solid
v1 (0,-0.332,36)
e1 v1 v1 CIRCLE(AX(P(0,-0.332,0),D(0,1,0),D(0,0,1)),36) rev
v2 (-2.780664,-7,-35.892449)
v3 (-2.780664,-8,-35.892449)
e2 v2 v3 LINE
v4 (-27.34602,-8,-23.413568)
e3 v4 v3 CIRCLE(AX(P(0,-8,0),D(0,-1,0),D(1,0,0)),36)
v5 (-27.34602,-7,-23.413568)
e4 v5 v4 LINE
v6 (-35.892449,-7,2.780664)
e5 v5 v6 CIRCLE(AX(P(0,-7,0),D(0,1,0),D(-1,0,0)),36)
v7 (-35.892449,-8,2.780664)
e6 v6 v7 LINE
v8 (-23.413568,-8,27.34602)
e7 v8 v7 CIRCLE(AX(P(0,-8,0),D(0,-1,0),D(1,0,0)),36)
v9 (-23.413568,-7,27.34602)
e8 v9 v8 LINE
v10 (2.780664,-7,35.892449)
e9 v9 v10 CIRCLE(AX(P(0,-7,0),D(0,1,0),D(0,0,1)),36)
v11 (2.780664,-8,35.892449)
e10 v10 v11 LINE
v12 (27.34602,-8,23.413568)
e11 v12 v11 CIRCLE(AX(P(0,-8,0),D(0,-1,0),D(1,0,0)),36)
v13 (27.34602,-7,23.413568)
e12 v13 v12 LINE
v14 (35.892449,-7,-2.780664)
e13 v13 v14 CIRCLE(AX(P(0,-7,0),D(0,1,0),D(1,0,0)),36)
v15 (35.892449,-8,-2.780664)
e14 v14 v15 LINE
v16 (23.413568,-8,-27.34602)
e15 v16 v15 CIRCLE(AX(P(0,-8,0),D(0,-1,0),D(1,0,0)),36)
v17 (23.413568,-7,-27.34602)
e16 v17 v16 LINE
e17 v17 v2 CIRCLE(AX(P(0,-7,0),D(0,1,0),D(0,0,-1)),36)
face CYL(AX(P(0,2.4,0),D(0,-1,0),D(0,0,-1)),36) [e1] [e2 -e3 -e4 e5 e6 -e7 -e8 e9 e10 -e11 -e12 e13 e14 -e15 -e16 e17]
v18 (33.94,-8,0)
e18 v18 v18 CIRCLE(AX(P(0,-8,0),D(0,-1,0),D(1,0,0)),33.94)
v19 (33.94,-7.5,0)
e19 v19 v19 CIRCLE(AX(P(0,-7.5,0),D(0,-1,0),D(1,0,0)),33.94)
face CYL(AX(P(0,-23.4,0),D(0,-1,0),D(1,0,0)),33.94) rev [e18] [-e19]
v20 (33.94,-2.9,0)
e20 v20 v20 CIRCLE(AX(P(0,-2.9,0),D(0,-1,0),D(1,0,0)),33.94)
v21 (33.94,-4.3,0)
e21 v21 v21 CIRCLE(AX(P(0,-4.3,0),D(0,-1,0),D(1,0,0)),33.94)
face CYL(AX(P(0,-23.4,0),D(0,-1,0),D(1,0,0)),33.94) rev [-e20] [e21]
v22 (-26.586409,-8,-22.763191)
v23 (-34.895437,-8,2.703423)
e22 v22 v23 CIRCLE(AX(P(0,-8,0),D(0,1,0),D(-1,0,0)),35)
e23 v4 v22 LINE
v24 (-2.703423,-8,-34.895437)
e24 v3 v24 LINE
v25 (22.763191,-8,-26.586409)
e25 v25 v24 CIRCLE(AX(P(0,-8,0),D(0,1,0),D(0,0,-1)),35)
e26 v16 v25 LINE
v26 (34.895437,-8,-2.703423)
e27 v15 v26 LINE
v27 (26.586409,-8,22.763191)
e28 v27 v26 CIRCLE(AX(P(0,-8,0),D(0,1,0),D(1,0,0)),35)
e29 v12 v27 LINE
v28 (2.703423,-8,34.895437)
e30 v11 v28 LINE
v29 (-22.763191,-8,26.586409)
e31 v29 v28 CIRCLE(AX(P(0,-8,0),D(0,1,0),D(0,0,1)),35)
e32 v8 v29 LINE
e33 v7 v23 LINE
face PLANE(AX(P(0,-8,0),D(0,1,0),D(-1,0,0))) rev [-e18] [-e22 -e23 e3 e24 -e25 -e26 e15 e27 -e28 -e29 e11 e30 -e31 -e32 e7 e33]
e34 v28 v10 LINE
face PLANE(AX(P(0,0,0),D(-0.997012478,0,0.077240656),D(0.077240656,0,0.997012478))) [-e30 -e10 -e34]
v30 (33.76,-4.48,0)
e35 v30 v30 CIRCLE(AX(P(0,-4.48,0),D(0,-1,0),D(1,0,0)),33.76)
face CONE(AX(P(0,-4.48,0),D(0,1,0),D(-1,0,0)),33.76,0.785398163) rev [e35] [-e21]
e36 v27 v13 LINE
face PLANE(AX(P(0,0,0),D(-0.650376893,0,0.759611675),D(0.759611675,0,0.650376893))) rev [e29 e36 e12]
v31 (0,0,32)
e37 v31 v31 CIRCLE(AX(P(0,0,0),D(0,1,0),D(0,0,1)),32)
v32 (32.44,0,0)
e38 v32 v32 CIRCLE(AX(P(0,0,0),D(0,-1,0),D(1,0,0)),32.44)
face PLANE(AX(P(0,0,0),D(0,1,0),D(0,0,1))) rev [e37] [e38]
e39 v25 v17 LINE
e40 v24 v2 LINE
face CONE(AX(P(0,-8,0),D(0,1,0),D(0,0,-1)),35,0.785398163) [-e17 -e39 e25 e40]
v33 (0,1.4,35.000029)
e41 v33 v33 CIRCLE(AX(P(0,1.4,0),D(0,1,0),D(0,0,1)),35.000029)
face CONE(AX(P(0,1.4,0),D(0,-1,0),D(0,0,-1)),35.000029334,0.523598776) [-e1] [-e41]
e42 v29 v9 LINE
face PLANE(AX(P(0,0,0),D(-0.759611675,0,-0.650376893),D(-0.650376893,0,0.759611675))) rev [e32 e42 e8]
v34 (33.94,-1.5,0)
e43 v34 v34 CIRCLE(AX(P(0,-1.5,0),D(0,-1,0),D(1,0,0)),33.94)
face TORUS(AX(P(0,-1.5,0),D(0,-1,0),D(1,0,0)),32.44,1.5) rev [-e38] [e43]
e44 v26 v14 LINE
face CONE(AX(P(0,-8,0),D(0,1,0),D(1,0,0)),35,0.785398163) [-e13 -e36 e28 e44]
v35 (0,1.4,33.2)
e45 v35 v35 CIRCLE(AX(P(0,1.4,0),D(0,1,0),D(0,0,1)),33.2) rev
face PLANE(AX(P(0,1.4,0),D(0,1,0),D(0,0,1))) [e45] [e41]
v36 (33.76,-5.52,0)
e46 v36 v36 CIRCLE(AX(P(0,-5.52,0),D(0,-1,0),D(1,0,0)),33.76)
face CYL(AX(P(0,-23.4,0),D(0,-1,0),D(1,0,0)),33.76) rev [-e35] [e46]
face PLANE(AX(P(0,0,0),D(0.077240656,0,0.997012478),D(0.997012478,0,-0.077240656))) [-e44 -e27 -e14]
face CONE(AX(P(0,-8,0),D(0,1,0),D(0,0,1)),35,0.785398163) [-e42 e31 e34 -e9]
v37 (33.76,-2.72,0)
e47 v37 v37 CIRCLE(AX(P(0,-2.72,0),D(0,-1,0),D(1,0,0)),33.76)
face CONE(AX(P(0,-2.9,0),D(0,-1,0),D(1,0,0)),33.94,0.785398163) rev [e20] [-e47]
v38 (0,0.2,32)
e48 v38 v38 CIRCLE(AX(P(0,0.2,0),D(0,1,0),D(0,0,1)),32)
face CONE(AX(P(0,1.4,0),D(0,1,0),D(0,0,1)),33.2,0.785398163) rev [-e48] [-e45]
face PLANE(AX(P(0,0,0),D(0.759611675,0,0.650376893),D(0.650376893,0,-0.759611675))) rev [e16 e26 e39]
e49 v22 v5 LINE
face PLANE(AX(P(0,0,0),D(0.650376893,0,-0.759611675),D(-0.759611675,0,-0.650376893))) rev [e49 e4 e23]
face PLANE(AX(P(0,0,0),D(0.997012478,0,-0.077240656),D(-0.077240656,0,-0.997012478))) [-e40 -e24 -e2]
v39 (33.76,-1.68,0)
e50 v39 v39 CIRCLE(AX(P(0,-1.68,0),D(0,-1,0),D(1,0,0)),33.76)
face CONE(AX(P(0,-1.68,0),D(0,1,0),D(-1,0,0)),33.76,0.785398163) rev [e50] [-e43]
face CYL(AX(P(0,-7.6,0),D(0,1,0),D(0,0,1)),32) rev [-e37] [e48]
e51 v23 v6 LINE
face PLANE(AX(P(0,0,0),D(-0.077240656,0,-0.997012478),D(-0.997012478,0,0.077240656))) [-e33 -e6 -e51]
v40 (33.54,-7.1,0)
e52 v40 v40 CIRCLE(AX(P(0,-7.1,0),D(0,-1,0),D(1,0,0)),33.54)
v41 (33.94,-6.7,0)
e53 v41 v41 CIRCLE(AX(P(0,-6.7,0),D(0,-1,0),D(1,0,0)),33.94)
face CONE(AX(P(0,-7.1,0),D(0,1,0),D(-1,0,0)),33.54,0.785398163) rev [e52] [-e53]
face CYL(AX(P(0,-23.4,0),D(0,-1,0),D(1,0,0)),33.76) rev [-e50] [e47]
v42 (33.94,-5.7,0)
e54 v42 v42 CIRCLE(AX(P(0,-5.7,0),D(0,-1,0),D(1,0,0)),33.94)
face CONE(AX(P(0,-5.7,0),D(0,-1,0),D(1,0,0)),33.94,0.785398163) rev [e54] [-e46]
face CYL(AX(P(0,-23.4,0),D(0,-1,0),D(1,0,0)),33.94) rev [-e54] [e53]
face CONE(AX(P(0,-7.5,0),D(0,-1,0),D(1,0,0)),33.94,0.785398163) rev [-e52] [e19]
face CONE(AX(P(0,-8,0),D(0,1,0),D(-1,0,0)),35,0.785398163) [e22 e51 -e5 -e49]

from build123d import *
from build123d.topology import SkipClean

# Parameters (mm, degrees)
SKETCH_1_R               = 36
EXTRUDE_1_DEPTH          = 2.4
SKETCH_3_R               = 32
CUT_EXTRUDE_1_DEPTH      = 10
SKETCH_4_R               = 36
CUT_EXTRUDE_2_DEPTH      = 1
CHAMFER_3_SIZE           = 1.732
CHAMFER_3_SIZE2          = 0.999970666
CHAMFER_2_SIZE           = 1.2
CUT_REVOLVE_1_ANGLE      = 45
PATTERN_CIRCULAR_1_COUNT = 4


with BuildPart() as part:
    # 草图1 → 凸台-拉伸1 (new body)
    with BuildSketch(Plane(origin=(0, 0, 0), x_dir=(1, 0, 0), z_dir=(0, 1, 0))):
        with Locations(Location((0, 0, 0), (0, 0, 270))):
            Circle(SKETCH_1_R)
    extrude(amount=EXTRUDE_1_DEPTH)

    # 草图2 → 旋转1 (revolve)
    with SkipClean():  # the faces are left unmerged after this step: merging them gives an invalid solid
        with BuildSketch(Plane.XY):
            with BuildLine():
                Line((33.94, -7.5), (33.94, -8))
                Line((33.94, -8), (36, -8))
                Line((36, -8), (36, 0))
                Line((36, 0), (32.44, 0))
                ThreePointArc((32.44, 0), (33.500660172, -0.439339828), (33.94, -1.5))
                Line((33.94, -1.5), (33.76, -1.68))
                Line((33.76, -1.68), (33.76, -2.72))
                Line((33.76, -2.72), (33.94, -2.9))
                Line((33.94, -2.9), (33.94, -4.3))
                Line((33.94, -4.3), (33.76, -4.48))
                Line((33.76, -4.48), (33.76, -5.52))
                Line((33.76, -5.52), (33.94, -5.7))
                Line((33.94, -5.7), (33.94, -6.7))
                Line((33.94, -6.7), (33.54, -7.1))
                Line((33.54, -7.1), (33.94, -7.5))
            make_face()
        revolve(axis=Axis((0, -23.4, 0), (0, 1, 0)))
    add(part.part.scale(1), mode=Mode.REPLACE)  # the faces are merged on a copy

    # 草图3 → 切除-拉伸1 (cut)
    with BuildSketch(Plane(origin=(0, 2.4, 0), x_dir=(1, 0, 0), z_dir=(0, 1, 0))):
        with Locations(Location((0, 0, 0), (0, 0, 270))):
            Circle(SKETCH_3_R)
    extrude(amount=-CUT_EXTRUDE_1_DEPTH, mode=Mode.SUBTRACT)

    # 草图4 → 切除-拉伸2 (cut)
    with BuildSketch(Plane(origin=(0, 2.4, 0), x_dir=(1, 0, 0), z_dir=(0, 1, 0))):
        Circle(SKETCH_4_R)
    extrude(amount=-CUT_EXTRUDE_2_DEPTH, mode=Mode.SUBTRACT)

    # 倒角3
    chamfer_3_edges = [part.edges().sort_by_distance(p)[0] for p in [
        (0, 1.4, -36),
    ]]
    chamfer_3_side = [part.faces().sort_by_distance(p)[0] for p in [
        (0, 0.7, -36),
    ]]
    chamfer(chamfer_3_edges, length=CHAMFER_3_SIZE, length2=CHAMFER_3_SIZE2, reference=chamfer_3_side[0])

    # 倒角2
    chamfer_2_edges = [part.edges().sort_by_distance(p)[0] for p in [
        (0, 1.4, -32),
    ]]
    chamfer(chamfer_2_edges, length=CHAMFER_2_SIZE)

    # 草图6 → 切除-旋转1 (revolve, cut)
    with BuildSketch(Plane(origin=(0, 0, 0), x_dir=(0.9970124779095012, 0, -0.07724065569864448), z_dir=(0.07724065569864448, 0, 0.9970124779095012))):
        Polygon((-35, -8), (-36, -7), (-36, -8), align=None)
    cut_revolve_1 = revolve(axis=Axis((0, -23.4, 0), (0, -1, 0)), revolution_arc=CUT_REVOLVE_1_ANGLE, mode=Mode.SUBTRACT)

    # 阵列(圆周)1: 切除-旋转1 ×4 about axis
    pattern_circular_1_axis = Axis((0, -23.4, 0), (0, 1, 0))
    for i in range(1, PATTERN_CIRCULAR_1_COUNT):
        add(cut_revolve_1.rotate(pattern_circular_1_axis, i * 360 / PATTERN_CIRCULAR_1_COUNT), mode=Mode.SUBTRACT)


solid = part.part
